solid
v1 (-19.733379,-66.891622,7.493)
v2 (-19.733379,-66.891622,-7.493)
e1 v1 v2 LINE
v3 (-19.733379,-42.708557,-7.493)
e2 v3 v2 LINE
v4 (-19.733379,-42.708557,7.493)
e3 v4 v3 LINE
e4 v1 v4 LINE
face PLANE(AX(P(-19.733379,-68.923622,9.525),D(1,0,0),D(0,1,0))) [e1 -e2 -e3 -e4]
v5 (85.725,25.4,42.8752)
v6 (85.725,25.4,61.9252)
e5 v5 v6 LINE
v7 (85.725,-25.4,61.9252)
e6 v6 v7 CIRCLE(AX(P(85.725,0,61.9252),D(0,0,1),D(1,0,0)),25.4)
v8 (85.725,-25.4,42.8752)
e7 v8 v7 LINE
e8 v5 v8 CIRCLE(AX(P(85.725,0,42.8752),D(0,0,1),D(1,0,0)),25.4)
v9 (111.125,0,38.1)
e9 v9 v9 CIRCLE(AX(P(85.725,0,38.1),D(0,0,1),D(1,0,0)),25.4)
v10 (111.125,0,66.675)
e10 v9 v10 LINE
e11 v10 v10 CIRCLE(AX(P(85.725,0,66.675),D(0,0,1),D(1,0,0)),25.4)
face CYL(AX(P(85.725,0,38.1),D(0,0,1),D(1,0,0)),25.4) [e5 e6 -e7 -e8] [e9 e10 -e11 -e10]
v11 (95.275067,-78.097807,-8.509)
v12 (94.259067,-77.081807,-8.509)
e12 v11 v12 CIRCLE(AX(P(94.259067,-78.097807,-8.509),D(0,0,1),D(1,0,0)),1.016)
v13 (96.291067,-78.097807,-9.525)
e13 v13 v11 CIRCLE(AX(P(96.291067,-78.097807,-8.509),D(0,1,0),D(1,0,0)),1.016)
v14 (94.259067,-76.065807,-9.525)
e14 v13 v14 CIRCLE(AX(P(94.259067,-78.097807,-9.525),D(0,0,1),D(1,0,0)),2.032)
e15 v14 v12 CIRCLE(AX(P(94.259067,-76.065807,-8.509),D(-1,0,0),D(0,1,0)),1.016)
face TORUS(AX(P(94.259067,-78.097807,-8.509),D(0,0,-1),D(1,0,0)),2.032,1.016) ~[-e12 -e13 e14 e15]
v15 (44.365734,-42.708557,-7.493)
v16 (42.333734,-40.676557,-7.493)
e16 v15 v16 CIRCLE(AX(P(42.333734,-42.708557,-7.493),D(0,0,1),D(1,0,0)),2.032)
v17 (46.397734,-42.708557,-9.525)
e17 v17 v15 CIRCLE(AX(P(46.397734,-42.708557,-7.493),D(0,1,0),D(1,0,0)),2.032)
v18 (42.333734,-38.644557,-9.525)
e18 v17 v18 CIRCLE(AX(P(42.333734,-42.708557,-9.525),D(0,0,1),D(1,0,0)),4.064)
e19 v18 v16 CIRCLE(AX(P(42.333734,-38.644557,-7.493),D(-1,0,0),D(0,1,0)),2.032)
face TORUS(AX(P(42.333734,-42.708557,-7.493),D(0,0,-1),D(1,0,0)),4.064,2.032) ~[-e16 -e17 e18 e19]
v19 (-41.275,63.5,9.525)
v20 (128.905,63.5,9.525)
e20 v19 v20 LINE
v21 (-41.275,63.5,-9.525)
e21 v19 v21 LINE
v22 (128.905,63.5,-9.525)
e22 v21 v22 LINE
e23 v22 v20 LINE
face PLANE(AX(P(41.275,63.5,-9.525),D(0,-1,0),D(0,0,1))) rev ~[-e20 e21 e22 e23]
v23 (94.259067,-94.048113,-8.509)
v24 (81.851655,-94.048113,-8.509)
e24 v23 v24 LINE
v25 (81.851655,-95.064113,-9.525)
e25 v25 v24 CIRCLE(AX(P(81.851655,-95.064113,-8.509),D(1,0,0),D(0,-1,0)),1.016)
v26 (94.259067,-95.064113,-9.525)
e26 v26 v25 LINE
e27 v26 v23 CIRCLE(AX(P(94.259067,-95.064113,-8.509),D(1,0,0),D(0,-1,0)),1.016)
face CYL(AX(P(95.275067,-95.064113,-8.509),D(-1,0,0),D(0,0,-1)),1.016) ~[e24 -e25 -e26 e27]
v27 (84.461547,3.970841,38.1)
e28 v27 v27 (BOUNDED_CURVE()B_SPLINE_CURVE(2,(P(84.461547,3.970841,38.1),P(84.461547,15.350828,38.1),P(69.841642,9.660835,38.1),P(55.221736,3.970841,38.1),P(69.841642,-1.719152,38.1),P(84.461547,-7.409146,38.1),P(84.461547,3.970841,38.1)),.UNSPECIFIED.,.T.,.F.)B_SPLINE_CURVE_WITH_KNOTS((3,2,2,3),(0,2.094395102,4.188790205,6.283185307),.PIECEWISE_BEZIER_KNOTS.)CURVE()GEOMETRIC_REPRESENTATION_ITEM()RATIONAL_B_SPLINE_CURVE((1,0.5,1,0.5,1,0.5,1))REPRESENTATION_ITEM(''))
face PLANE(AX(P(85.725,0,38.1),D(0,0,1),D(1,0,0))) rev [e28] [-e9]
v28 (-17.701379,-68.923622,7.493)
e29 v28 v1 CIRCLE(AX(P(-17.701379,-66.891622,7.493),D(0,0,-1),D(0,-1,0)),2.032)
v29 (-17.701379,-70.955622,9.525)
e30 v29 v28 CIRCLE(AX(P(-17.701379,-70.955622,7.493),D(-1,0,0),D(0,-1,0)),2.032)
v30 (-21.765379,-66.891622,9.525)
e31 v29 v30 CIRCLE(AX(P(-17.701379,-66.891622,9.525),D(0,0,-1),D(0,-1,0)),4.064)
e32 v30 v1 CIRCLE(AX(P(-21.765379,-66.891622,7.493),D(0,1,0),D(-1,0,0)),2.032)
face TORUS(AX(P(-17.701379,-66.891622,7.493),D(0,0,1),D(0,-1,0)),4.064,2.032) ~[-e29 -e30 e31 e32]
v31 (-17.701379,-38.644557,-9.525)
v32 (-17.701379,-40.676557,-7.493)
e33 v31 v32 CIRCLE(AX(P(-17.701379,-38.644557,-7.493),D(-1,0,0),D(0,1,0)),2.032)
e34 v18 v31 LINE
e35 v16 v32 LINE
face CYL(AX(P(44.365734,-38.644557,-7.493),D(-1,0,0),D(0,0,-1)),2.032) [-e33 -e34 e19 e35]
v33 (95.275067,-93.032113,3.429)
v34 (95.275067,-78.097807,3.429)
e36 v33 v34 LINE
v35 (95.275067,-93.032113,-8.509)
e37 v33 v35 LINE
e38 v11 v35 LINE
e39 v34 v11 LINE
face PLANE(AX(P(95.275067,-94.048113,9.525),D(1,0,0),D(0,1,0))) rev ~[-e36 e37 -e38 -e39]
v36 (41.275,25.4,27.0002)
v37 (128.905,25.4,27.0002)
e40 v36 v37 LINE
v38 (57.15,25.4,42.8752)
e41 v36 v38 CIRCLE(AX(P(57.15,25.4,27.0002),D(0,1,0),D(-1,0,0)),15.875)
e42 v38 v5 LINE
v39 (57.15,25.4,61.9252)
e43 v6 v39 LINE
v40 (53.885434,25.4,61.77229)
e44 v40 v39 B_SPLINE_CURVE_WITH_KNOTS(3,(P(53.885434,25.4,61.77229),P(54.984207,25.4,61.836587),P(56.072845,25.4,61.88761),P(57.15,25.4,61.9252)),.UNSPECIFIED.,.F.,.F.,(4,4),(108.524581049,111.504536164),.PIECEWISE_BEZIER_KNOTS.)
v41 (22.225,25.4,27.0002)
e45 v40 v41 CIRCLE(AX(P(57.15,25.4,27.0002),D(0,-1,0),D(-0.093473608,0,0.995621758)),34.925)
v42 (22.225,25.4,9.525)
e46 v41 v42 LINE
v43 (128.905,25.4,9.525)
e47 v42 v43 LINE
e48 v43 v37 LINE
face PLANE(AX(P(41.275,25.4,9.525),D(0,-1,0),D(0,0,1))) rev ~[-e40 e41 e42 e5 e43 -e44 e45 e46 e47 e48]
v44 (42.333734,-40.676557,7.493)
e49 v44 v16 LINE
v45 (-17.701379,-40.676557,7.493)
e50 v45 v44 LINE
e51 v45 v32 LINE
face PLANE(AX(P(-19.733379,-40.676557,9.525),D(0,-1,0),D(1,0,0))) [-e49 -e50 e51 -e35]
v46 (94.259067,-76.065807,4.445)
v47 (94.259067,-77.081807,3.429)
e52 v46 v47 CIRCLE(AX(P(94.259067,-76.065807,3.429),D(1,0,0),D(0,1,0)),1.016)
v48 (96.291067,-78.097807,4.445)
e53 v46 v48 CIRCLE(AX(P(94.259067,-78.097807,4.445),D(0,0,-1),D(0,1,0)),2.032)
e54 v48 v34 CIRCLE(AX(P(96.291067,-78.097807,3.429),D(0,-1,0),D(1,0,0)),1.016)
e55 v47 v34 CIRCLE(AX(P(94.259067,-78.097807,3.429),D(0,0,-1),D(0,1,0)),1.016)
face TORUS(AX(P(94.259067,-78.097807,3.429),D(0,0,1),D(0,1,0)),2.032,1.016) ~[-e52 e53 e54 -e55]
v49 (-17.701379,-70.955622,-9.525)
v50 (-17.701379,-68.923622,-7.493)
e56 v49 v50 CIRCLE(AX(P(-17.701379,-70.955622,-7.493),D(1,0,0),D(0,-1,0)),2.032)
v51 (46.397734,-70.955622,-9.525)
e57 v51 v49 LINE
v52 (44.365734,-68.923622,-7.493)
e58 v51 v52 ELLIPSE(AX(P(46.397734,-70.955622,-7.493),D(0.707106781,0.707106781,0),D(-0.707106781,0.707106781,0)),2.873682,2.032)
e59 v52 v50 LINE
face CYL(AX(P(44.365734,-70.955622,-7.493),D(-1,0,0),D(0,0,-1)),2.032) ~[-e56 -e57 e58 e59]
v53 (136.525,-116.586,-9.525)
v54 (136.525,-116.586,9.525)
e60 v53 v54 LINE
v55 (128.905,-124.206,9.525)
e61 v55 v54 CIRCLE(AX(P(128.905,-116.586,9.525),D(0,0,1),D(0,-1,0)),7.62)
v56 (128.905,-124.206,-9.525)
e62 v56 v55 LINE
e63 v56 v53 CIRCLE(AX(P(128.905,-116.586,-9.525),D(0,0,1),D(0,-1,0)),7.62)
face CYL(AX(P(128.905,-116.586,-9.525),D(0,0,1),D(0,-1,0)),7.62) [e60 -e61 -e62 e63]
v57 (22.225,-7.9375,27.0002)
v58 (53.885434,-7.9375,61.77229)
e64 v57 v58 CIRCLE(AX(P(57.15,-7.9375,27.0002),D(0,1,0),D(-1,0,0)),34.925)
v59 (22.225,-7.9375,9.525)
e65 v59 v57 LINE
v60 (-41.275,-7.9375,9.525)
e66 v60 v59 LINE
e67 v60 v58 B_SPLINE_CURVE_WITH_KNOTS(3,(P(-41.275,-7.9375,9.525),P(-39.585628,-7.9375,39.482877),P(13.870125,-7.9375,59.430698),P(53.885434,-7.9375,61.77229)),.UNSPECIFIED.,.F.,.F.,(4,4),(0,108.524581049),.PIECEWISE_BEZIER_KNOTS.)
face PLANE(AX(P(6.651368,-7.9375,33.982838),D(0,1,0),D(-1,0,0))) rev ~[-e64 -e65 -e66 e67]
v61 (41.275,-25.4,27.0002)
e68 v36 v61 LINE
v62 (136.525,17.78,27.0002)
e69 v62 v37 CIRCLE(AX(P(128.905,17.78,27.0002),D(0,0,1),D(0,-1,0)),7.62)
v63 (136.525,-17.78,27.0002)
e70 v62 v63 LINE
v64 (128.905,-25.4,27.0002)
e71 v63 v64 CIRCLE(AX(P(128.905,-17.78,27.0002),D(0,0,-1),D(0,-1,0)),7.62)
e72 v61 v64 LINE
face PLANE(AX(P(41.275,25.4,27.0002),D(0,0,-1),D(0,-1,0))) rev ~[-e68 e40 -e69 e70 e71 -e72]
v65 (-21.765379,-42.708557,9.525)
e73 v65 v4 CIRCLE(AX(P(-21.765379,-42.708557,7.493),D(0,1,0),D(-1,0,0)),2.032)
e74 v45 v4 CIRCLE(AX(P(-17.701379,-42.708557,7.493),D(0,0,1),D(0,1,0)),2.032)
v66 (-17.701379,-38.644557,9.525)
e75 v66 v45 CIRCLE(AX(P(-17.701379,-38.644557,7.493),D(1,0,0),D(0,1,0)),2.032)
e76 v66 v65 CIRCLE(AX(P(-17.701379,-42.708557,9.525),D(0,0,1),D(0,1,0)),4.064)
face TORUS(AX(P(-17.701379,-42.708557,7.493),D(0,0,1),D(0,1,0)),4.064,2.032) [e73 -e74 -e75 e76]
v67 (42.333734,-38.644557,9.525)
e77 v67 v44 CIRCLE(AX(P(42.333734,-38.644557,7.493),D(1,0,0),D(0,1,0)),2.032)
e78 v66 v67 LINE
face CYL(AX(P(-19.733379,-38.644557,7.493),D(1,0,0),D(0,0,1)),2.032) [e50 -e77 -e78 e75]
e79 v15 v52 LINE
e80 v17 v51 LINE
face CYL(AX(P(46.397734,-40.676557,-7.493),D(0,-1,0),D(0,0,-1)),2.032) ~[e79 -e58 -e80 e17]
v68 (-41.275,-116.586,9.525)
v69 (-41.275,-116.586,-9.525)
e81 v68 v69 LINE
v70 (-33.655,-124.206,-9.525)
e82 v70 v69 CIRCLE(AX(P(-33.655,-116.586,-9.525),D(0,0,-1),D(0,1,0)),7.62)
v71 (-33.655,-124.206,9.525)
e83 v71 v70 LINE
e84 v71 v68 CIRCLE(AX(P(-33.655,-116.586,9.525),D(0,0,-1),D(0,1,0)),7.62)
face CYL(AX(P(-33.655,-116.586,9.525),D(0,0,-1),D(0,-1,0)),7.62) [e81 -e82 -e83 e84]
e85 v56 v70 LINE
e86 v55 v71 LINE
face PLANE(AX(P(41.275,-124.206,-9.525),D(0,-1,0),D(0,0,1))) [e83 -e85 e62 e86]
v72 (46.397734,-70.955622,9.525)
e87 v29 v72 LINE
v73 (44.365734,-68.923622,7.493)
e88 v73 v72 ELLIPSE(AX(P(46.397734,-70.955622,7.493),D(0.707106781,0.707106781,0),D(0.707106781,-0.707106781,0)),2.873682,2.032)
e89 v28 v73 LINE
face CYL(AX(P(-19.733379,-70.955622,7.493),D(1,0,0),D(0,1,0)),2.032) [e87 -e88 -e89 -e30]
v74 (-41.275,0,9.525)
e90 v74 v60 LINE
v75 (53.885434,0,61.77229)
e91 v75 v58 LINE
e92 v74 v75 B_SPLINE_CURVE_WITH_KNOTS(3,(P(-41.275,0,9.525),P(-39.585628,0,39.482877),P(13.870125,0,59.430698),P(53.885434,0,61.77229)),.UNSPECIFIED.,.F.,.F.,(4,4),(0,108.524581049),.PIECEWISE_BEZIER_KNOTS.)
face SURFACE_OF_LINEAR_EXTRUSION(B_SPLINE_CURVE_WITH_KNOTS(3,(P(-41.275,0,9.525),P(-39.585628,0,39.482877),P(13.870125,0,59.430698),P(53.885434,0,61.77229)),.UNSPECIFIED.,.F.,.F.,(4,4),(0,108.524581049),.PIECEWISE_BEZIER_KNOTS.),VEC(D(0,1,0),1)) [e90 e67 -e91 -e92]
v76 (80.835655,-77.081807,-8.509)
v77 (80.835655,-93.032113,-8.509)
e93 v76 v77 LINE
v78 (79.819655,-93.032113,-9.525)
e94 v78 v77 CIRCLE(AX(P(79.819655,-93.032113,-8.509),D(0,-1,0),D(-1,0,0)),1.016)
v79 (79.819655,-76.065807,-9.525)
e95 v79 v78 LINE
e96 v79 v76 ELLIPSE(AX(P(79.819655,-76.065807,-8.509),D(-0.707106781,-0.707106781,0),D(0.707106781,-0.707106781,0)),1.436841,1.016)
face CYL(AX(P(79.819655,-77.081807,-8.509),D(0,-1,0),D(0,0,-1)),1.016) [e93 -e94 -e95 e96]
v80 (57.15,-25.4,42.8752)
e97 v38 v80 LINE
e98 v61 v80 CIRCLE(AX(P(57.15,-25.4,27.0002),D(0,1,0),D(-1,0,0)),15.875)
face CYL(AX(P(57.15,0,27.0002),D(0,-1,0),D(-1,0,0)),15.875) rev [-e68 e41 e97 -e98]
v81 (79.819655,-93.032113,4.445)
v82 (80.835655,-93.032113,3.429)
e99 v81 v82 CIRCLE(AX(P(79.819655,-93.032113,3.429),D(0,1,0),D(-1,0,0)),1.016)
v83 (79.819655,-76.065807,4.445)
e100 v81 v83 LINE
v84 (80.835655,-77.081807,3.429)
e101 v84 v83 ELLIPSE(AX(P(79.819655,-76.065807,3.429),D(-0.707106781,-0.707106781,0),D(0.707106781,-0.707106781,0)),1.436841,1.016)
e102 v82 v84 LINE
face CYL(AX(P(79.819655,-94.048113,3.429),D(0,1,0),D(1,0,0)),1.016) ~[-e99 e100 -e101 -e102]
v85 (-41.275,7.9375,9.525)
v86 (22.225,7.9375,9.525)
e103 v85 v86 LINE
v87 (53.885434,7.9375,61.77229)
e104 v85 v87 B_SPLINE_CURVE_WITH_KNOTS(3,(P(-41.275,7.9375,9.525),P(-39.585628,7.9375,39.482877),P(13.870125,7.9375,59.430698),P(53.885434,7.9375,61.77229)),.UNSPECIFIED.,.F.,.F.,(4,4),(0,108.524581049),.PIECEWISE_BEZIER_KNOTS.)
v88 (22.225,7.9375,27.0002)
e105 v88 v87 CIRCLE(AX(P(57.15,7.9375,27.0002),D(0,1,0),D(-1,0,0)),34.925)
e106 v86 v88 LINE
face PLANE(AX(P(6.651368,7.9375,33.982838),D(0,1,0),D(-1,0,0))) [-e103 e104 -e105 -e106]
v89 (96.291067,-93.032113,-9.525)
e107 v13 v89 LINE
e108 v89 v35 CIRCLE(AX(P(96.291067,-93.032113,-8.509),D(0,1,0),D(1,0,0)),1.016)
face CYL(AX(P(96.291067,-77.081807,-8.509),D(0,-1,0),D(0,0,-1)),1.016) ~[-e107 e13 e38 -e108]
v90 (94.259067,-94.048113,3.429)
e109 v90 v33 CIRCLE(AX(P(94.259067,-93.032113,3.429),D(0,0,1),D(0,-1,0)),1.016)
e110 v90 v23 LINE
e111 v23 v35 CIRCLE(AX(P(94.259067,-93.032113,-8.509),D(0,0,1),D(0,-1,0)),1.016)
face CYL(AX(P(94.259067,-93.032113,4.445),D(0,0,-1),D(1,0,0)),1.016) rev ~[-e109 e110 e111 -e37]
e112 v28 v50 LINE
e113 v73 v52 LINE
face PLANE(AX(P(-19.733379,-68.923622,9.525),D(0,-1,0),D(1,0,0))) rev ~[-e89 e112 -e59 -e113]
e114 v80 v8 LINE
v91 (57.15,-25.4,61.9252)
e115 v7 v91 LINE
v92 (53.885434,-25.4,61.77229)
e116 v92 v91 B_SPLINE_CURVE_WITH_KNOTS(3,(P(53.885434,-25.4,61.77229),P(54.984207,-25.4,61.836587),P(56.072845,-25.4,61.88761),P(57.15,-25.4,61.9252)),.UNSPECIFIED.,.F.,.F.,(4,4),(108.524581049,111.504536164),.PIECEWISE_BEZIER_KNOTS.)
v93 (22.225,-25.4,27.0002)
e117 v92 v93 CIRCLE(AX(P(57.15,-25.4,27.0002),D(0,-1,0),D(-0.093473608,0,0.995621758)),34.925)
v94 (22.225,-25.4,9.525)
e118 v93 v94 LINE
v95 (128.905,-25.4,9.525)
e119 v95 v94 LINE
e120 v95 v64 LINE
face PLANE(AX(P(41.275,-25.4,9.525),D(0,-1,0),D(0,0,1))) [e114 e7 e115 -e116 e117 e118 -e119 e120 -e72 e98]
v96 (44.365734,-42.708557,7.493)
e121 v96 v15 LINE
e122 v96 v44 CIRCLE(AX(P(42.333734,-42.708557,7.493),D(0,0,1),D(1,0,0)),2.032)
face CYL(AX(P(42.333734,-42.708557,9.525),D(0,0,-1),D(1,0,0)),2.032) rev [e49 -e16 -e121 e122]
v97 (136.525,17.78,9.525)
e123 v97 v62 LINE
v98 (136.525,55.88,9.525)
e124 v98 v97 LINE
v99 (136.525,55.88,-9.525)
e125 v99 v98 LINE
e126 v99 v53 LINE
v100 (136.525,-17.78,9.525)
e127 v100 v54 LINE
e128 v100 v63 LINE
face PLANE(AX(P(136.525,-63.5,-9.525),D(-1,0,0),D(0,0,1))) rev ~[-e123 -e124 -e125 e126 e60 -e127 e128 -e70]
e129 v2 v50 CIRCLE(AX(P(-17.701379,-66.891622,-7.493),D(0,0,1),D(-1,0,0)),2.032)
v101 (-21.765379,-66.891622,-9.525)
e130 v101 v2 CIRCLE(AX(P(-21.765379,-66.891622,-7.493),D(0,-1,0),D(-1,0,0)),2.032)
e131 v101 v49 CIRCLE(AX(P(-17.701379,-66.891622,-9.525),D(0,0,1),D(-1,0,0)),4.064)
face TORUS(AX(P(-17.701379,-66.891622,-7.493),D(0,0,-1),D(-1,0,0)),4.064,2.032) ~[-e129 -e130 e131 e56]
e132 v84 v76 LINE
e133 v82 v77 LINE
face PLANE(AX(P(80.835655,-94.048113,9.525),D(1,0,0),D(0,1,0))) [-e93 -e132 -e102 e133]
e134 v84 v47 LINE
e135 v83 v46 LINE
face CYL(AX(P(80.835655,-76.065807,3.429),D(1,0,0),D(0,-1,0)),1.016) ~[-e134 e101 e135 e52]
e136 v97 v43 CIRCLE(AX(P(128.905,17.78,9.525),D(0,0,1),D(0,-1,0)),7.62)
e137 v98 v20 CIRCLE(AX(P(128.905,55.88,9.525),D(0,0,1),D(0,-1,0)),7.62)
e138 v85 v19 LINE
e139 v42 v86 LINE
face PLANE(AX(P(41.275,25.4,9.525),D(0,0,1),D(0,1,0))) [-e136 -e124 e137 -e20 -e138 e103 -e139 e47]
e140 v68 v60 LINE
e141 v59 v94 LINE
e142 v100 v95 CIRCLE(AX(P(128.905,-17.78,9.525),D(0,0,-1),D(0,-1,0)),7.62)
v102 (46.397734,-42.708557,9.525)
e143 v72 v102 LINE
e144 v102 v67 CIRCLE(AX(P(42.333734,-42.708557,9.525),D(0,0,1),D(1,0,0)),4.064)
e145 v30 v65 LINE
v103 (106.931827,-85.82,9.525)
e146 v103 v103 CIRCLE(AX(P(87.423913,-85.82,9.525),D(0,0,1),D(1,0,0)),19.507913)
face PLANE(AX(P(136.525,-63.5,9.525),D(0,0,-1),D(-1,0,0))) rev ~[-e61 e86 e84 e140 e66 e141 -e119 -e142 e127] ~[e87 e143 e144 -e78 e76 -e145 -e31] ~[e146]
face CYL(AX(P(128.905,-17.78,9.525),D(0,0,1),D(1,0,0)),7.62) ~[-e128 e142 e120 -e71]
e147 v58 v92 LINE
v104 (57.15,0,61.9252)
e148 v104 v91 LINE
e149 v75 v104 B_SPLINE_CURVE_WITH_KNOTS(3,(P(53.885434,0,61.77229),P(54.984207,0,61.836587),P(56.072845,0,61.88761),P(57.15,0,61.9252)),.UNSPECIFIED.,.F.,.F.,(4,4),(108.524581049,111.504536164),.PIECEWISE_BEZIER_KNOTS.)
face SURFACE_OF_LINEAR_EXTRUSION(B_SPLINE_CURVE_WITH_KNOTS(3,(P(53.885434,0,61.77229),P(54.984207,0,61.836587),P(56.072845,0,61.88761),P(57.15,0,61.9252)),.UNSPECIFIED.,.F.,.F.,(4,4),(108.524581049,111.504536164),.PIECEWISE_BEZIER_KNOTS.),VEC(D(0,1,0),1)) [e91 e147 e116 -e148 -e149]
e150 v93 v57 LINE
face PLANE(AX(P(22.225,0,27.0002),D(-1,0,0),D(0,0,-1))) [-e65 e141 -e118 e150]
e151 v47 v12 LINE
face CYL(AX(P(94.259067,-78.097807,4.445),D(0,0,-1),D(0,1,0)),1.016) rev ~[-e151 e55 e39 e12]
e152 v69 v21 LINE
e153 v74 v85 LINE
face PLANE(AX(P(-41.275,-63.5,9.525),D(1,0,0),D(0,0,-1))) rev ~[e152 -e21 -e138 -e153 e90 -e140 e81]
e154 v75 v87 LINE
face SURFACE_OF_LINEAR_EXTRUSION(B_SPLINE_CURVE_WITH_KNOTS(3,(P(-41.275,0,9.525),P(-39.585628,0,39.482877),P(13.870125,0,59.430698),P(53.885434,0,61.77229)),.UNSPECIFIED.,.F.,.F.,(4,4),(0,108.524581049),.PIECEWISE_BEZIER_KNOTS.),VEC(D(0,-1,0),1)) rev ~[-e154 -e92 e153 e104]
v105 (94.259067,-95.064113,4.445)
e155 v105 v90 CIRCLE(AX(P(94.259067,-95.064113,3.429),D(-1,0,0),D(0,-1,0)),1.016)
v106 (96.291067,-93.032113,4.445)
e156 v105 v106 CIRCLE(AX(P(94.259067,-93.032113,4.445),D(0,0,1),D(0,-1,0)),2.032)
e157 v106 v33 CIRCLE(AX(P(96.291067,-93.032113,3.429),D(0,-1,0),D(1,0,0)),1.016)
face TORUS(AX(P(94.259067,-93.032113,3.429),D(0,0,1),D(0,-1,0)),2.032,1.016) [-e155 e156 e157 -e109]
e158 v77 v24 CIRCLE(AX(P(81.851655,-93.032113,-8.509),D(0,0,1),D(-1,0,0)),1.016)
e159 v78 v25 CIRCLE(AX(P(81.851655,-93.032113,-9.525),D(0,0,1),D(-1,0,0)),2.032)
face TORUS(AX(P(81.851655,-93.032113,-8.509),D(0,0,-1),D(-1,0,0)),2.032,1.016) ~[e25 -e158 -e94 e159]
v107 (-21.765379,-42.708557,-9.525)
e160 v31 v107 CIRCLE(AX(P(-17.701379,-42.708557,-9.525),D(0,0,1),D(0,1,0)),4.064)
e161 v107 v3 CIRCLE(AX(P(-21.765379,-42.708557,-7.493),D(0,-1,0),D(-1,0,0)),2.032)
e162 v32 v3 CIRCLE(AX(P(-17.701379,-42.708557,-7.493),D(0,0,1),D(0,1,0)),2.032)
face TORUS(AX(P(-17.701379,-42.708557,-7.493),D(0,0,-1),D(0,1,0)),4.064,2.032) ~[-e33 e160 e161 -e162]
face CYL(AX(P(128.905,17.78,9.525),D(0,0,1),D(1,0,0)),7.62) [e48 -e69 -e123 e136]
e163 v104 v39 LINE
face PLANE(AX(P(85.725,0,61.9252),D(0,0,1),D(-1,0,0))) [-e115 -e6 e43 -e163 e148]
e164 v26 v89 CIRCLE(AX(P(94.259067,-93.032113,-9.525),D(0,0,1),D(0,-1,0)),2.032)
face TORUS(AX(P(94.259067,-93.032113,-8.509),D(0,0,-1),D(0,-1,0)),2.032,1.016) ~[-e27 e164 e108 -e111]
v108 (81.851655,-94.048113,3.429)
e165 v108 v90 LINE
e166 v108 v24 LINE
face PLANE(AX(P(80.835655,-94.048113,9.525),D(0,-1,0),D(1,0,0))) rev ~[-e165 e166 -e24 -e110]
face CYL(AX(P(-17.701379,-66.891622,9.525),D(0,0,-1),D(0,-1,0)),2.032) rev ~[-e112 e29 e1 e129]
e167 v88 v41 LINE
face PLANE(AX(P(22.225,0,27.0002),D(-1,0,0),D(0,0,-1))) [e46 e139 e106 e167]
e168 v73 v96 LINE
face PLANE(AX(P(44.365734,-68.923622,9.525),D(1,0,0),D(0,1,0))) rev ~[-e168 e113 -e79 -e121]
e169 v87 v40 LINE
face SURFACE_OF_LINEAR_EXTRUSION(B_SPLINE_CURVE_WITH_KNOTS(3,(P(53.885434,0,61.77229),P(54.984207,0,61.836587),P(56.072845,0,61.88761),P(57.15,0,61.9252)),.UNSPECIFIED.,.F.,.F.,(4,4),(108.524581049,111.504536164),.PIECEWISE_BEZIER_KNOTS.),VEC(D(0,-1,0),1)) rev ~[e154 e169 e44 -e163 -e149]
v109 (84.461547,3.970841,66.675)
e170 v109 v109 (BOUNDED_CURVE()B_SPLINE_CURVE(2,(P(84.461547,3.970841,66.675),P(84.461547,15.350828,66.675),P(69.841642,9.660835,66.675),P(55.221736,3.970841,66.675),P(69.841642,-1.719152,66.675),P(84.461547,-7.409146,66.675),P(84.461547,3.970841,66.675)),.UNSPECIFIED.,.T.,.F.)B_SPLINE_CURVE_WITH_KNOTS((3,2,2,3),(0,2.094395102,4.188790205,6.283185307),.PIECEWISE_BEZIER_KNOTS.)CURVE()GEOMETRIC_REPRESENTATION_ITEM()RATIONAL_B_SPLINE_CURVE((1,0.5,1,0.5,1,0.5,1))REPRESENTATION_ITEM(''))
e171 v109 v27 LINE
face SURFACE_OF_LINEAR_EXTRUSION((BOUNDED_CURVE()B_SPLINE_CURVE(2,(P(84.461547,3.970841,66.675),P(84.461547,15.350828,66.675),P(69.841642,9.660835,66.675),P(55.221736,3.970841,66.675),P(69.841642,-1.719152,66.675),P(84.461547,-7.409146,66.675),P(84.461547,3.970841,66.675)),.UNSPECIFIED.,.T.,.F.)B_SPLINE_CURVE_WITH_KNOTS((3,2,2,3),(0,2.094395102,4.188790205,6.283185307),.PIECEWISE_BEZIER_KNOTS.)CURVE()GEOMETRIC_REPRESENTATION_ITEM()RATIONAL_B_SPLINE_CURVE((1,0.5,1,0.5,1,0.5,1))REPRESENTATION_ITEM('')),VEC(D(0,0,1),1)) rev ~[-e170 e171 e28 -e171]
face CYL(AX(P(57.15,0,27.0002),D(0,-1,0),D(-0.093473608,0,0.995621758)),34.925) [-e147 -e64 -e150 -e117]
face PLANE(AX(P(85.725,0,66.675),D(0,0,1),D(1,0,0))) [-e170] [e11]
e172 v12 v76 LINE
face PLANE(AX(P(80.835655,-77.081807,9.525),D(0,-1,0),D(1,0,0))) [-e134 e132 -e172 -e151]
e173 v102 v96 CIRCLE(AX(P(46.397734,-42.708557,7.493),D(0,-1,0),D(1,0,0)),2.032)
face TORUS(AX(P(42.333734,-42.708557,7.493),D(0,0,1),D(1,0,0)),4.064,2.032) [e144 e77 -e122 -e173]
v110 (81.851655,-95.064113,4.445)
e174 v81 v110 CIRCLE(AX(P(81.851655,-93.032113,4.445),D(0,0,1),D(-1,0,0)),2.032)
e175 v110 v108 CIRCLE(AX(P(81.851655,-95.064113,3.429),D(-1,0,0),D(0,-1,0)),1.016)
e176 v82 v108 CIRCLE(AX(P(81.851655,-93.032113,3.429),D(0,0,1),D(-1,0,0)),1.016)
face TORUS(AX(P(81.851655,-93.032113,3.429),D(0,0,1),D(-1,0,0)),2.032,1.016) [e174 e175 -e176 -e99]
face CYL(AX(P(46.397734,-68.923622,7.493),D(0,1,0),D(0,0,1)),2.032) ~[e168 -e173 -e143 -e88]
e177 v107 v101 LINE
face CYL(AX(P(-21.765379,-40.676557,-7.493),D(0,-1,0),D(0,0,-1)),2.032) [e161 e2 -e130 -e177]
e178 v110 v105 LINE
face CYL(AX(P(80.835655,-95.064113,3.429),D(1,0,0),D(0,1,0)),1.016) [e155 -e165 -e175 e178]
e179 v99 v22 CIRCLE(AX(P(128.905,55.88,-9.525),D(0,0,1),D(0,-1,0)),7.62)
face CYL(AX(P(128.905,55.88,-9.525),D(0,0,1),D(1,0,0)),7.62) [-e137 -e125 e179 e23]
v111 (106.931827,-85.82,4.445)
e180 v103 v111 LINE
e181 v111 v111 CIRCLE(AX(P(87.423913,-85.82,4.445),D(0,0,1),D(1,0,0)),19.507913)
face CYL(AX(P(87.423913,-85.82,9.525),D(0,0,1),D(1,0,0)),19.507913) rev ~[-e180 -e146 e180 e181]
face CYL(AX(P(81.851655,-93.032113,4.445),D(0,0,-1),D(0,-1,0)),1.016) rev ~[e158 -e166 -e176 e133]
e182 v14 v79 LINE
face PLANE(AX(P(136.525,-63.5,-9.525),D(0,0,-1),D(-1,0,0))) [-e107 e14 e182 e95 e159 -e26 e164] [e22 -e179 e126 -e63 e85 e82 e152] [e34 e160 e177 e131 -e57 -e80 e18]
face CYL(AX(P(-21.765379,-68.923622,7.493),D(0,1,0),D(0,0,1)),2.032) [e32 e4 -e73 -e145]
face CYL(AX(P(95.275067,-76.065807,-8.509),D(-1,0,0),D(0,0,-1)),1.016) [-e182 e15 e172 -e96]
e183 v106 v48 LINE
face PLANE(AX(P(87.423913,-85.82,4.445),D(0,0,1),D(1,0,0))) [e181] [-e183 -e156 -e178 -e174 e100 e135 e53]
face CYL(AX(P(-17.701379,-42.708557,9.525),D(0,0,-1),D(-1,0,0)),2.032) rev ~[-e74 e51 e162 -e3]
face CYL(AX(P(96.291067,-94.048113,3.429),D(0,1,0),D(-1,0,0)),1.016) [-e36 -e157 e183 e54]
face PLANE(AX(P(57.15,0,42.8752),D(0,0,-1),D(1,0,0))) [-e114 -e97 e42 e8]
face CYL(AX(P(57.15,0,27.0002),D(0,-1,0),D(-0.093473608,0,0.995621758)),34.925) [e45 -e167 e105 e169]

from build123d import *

# Parameters (mm, degrees)
F1_DEPTH  = 63.5
F0_W      = 25.4
F0_H      = 19.05
F2_DEPTH  = 25.4
F3_DEPTH  = 7.9375
F5_DEPTH  = 95.25
F6_DEPTH  = 60.706
F7_W      = 64.0991125256
F7_H      = 28.2470658422
F8_DEPTH  = 25.4
F9_R      = 19.5079134093
F10_DEPTH = 5.08
F11_W     = 14.4394114614
F11_H     = 16.9663056731
F12_DEPTH = 25.4
F14_DEPTH = 28.575
F15_R     = 7.62
F16_R     = 2.032
F17_R     = 1.016


with BuildPart() as f1:
    # F0 (on Front) → F1 (new body, symmetric)
    with BuildSketch(Plane.XZ):
        Polygon((22.225, 9.525), (-41.275, 9.525), (-41.275, -9.525), (41.275, -9.525), (41.275, 9.525), align=None)
    extrude(amount=F1_DEPTH, both=True)

    # F0 (on Front) → F2 (join, symmetric)
    with BuildSketch(Plane.XZ):
        with BuildLine():
            Line((22.225, 27.0002), (22.225, 9.525))
            Line((22.225, 9.525), (41.275, 9.525))
            Line((41.275, 9.525), (41.275, 27.0002))
            ThreePointArc((41.275, 27.0002), (45.9246798487, 38.2255201513), (57.15, 42.8752))
            Line((57.15, 42.8752), (60.325, 42.8752))
            Line((60.325, 42.8752), (60.325, 61.9252))
            Line((60.325, 61.9252), (57.15, 61.9252))
            add(Edge.make_bspline(
                [(53.8854342407, 61.7722898912), (54.9842067368, 61.8365871986), (56.0728453275, 61.8876096574), (57.15, 61.9252)],
                knots=[108.5245810491, 108.5245810491, 108.5245810491, 108.5245810491, 111.5045361635, 111.5045361635, 111.5045361635, 111.5045361635], degree=3))
            ThreePointArc((53.8854342407, 61.7722898912), (31.3258777096, 50.5133948686), (22.225, 27.0002))
        make_face()
        with Locations((73.025, 52.4002)):
            Rectangle(F0_W, F0_H)
    extrude(amount=F2_DEPTH, both=True)

    # F0 (on Front) → F3 (join, symmetric)
    with BuildSketch(Plane.XZ):
        with BuildLine():
            add(Edge.make_bspline(
                [(-41.275, 9.525), (-39.5856284224, 39.4828766469), (13.870125209, 59.4306981306), (53.8854342407, 61.7722898912)],
                knots=[0, 0, 0, 0, 108.5245810491, 108.5245810491, 108.5245810491, 108.5245810491], degree=3))
            Line((-41.275, 9.525), (22.225, 9.525))
            Line((22.225, 9.525), (22.225, 27.0002))
            ThreePointArc((22.225, 27.0002), (31.3258777096, 50.5133948686), (53.8854342407, 61.7722898912))
        make_face()
    extrude(amount=F3_DEPTH, both=True)

    # F0 (on Front) → F4 (revolve)
    with BuildSketch(Plane.XZ):
        Polygon((85.725, 66.675), (85.725, 61.9252), (85.725, 42.8752), (85.725, 38.1), (111.125, 38.1), (111.125, 66.675), align=None)
    revolve(axis=Axis((85.725, 0, 52.3875), (0, 0, 1)))

    # F5 (add): a face of the model
    f5_faces = [f1.faces().sort_by_distance(p)[0] for p in [
        (41.275, 0, 4.9023288334),
    ]]
    extrude(f5_faces, amount=F5_DEPTH)

    # F6 (add): a face of the model
    f6_faces = [f1.faces().sort_by_distance(p)[0] for p in [
        (47.625, -63.5, 0),
    ]]
    extrude(f6_faces, amount=F6_DEPTH)

    # F7 (on face) → F8 (cut)
    with BuildSketch(Plane.XY.offset(9.525)):
        with Locations((12.3161775991, -54.8000894487)):
            Rectangle(F7_W, F7_H)
    extrude(amount=-F8_DEPTH, mode=Mode.SUBTRACT)

    # F9 (on face) → F10 (cut)
    with BuildSketch(Plane.XY.offset(9.525)):
        with Locations((87.4239131329, -85.8199995224)):
            Circle(F9_R)
    extrude(amount=-F10_DEPTH, mode=Mode.SUBTRACT)

    # F11 (on face) → F12 (cut)
    with BuildSketch(Plane.XY.offset(9.525)):
        with Locations((88.0553610623, -85.5649597943)):
            Rectangle(F11_W, F11_H)
    extrude(amount=-F12_DEPTH, mode=Mode.SUBTRACT)

    # F13 (on face) → F14 (cut, through all)
    with BuildSketch(Plane.XY.offset(66.675)):
        with BuildLine():
            add(Edge.make_bspline(
                [(84.4615474343, 3.9708414115), (84.4615474343, 15.3508284031), (69.8416419327, 9.6608349073), (55.2217364311, 3.9708414115), (69.8416419327, -1.7191520843), (84.4615474343, -7.4091455801), (84.4615474343, 3.9708414115)],
                knots=[0, 0, 0, 2.0943951024, 2.0943951024, 4.1887902048, 4.1887902048, 6.2831853072, 6.2831853072, 6.2831853072], degree=2, weights=[1, 0.5, 1, 0.5, 1, 0.5, 1]))
        make_face()
    extrude(amount=-F14_DEPTH, mode=Mode.SUBTRACT)

    # F15
    f15_edges = [f1.edges().sort_by_distance(p)[0] for p in [
        (-41.275, -124.206, 0),
        (136.525, -124.206, 0),
        (136.525, -25.4, 18.2626),
        (136.525, 25.4, 18.2626),
        (136.525, 63.5, 0),
    ]]
    fillet(f15_edges, radius=F15_R)

    # F16
    f16_edges = [f1.edges().sort_by_distance(p)[0] for p in [
        (-19.733379, -54.800089, 9.525),
        (-19.733379, -68.923622, 0),
        (-19.733379, -54.800089, -9.525),
        (-19.733379, -40.676557, 0),
        (12.316178, -40.676557, 9.525),
        (12.316178, -40.676557, -9.525),
        (44.365734, -40.676557, 0),
        (12.316178, -68.923622, -9.525),
        (44.365734, -54.800089, -9.525),
        (12.316178, -68.923622, 9.525),
        (44.365734, -54.800089, 9.525),
    ]]
    fillet(f16_edges, radius=F16_R)

    # F17
    f17_edges = [f1.edges().sort_by_distance(p)[0] for p in [
        (88.055361, -77.081807, 4.445),
        (95.275067, -85.56496, 4.445),
        (95.275067, -77.081807, -2.54),
        (95.275067, -85.56496, -9.525),
        (95.275067, -94.048113, -2.54),
        (80.835655, -85.56496, 4.445),
        (88.055361, -94.048113, 4.445),
        (88.055361, -94.048113, -9.525),
        (80.835655, -94.048113, -2.54),
        (80.835655, -85.56496, -9.525),
        (88.055361, -77.081807, -9.525),
    ]]
    fillet(f17_edges, radius=F17_R)


solid = f1.part
